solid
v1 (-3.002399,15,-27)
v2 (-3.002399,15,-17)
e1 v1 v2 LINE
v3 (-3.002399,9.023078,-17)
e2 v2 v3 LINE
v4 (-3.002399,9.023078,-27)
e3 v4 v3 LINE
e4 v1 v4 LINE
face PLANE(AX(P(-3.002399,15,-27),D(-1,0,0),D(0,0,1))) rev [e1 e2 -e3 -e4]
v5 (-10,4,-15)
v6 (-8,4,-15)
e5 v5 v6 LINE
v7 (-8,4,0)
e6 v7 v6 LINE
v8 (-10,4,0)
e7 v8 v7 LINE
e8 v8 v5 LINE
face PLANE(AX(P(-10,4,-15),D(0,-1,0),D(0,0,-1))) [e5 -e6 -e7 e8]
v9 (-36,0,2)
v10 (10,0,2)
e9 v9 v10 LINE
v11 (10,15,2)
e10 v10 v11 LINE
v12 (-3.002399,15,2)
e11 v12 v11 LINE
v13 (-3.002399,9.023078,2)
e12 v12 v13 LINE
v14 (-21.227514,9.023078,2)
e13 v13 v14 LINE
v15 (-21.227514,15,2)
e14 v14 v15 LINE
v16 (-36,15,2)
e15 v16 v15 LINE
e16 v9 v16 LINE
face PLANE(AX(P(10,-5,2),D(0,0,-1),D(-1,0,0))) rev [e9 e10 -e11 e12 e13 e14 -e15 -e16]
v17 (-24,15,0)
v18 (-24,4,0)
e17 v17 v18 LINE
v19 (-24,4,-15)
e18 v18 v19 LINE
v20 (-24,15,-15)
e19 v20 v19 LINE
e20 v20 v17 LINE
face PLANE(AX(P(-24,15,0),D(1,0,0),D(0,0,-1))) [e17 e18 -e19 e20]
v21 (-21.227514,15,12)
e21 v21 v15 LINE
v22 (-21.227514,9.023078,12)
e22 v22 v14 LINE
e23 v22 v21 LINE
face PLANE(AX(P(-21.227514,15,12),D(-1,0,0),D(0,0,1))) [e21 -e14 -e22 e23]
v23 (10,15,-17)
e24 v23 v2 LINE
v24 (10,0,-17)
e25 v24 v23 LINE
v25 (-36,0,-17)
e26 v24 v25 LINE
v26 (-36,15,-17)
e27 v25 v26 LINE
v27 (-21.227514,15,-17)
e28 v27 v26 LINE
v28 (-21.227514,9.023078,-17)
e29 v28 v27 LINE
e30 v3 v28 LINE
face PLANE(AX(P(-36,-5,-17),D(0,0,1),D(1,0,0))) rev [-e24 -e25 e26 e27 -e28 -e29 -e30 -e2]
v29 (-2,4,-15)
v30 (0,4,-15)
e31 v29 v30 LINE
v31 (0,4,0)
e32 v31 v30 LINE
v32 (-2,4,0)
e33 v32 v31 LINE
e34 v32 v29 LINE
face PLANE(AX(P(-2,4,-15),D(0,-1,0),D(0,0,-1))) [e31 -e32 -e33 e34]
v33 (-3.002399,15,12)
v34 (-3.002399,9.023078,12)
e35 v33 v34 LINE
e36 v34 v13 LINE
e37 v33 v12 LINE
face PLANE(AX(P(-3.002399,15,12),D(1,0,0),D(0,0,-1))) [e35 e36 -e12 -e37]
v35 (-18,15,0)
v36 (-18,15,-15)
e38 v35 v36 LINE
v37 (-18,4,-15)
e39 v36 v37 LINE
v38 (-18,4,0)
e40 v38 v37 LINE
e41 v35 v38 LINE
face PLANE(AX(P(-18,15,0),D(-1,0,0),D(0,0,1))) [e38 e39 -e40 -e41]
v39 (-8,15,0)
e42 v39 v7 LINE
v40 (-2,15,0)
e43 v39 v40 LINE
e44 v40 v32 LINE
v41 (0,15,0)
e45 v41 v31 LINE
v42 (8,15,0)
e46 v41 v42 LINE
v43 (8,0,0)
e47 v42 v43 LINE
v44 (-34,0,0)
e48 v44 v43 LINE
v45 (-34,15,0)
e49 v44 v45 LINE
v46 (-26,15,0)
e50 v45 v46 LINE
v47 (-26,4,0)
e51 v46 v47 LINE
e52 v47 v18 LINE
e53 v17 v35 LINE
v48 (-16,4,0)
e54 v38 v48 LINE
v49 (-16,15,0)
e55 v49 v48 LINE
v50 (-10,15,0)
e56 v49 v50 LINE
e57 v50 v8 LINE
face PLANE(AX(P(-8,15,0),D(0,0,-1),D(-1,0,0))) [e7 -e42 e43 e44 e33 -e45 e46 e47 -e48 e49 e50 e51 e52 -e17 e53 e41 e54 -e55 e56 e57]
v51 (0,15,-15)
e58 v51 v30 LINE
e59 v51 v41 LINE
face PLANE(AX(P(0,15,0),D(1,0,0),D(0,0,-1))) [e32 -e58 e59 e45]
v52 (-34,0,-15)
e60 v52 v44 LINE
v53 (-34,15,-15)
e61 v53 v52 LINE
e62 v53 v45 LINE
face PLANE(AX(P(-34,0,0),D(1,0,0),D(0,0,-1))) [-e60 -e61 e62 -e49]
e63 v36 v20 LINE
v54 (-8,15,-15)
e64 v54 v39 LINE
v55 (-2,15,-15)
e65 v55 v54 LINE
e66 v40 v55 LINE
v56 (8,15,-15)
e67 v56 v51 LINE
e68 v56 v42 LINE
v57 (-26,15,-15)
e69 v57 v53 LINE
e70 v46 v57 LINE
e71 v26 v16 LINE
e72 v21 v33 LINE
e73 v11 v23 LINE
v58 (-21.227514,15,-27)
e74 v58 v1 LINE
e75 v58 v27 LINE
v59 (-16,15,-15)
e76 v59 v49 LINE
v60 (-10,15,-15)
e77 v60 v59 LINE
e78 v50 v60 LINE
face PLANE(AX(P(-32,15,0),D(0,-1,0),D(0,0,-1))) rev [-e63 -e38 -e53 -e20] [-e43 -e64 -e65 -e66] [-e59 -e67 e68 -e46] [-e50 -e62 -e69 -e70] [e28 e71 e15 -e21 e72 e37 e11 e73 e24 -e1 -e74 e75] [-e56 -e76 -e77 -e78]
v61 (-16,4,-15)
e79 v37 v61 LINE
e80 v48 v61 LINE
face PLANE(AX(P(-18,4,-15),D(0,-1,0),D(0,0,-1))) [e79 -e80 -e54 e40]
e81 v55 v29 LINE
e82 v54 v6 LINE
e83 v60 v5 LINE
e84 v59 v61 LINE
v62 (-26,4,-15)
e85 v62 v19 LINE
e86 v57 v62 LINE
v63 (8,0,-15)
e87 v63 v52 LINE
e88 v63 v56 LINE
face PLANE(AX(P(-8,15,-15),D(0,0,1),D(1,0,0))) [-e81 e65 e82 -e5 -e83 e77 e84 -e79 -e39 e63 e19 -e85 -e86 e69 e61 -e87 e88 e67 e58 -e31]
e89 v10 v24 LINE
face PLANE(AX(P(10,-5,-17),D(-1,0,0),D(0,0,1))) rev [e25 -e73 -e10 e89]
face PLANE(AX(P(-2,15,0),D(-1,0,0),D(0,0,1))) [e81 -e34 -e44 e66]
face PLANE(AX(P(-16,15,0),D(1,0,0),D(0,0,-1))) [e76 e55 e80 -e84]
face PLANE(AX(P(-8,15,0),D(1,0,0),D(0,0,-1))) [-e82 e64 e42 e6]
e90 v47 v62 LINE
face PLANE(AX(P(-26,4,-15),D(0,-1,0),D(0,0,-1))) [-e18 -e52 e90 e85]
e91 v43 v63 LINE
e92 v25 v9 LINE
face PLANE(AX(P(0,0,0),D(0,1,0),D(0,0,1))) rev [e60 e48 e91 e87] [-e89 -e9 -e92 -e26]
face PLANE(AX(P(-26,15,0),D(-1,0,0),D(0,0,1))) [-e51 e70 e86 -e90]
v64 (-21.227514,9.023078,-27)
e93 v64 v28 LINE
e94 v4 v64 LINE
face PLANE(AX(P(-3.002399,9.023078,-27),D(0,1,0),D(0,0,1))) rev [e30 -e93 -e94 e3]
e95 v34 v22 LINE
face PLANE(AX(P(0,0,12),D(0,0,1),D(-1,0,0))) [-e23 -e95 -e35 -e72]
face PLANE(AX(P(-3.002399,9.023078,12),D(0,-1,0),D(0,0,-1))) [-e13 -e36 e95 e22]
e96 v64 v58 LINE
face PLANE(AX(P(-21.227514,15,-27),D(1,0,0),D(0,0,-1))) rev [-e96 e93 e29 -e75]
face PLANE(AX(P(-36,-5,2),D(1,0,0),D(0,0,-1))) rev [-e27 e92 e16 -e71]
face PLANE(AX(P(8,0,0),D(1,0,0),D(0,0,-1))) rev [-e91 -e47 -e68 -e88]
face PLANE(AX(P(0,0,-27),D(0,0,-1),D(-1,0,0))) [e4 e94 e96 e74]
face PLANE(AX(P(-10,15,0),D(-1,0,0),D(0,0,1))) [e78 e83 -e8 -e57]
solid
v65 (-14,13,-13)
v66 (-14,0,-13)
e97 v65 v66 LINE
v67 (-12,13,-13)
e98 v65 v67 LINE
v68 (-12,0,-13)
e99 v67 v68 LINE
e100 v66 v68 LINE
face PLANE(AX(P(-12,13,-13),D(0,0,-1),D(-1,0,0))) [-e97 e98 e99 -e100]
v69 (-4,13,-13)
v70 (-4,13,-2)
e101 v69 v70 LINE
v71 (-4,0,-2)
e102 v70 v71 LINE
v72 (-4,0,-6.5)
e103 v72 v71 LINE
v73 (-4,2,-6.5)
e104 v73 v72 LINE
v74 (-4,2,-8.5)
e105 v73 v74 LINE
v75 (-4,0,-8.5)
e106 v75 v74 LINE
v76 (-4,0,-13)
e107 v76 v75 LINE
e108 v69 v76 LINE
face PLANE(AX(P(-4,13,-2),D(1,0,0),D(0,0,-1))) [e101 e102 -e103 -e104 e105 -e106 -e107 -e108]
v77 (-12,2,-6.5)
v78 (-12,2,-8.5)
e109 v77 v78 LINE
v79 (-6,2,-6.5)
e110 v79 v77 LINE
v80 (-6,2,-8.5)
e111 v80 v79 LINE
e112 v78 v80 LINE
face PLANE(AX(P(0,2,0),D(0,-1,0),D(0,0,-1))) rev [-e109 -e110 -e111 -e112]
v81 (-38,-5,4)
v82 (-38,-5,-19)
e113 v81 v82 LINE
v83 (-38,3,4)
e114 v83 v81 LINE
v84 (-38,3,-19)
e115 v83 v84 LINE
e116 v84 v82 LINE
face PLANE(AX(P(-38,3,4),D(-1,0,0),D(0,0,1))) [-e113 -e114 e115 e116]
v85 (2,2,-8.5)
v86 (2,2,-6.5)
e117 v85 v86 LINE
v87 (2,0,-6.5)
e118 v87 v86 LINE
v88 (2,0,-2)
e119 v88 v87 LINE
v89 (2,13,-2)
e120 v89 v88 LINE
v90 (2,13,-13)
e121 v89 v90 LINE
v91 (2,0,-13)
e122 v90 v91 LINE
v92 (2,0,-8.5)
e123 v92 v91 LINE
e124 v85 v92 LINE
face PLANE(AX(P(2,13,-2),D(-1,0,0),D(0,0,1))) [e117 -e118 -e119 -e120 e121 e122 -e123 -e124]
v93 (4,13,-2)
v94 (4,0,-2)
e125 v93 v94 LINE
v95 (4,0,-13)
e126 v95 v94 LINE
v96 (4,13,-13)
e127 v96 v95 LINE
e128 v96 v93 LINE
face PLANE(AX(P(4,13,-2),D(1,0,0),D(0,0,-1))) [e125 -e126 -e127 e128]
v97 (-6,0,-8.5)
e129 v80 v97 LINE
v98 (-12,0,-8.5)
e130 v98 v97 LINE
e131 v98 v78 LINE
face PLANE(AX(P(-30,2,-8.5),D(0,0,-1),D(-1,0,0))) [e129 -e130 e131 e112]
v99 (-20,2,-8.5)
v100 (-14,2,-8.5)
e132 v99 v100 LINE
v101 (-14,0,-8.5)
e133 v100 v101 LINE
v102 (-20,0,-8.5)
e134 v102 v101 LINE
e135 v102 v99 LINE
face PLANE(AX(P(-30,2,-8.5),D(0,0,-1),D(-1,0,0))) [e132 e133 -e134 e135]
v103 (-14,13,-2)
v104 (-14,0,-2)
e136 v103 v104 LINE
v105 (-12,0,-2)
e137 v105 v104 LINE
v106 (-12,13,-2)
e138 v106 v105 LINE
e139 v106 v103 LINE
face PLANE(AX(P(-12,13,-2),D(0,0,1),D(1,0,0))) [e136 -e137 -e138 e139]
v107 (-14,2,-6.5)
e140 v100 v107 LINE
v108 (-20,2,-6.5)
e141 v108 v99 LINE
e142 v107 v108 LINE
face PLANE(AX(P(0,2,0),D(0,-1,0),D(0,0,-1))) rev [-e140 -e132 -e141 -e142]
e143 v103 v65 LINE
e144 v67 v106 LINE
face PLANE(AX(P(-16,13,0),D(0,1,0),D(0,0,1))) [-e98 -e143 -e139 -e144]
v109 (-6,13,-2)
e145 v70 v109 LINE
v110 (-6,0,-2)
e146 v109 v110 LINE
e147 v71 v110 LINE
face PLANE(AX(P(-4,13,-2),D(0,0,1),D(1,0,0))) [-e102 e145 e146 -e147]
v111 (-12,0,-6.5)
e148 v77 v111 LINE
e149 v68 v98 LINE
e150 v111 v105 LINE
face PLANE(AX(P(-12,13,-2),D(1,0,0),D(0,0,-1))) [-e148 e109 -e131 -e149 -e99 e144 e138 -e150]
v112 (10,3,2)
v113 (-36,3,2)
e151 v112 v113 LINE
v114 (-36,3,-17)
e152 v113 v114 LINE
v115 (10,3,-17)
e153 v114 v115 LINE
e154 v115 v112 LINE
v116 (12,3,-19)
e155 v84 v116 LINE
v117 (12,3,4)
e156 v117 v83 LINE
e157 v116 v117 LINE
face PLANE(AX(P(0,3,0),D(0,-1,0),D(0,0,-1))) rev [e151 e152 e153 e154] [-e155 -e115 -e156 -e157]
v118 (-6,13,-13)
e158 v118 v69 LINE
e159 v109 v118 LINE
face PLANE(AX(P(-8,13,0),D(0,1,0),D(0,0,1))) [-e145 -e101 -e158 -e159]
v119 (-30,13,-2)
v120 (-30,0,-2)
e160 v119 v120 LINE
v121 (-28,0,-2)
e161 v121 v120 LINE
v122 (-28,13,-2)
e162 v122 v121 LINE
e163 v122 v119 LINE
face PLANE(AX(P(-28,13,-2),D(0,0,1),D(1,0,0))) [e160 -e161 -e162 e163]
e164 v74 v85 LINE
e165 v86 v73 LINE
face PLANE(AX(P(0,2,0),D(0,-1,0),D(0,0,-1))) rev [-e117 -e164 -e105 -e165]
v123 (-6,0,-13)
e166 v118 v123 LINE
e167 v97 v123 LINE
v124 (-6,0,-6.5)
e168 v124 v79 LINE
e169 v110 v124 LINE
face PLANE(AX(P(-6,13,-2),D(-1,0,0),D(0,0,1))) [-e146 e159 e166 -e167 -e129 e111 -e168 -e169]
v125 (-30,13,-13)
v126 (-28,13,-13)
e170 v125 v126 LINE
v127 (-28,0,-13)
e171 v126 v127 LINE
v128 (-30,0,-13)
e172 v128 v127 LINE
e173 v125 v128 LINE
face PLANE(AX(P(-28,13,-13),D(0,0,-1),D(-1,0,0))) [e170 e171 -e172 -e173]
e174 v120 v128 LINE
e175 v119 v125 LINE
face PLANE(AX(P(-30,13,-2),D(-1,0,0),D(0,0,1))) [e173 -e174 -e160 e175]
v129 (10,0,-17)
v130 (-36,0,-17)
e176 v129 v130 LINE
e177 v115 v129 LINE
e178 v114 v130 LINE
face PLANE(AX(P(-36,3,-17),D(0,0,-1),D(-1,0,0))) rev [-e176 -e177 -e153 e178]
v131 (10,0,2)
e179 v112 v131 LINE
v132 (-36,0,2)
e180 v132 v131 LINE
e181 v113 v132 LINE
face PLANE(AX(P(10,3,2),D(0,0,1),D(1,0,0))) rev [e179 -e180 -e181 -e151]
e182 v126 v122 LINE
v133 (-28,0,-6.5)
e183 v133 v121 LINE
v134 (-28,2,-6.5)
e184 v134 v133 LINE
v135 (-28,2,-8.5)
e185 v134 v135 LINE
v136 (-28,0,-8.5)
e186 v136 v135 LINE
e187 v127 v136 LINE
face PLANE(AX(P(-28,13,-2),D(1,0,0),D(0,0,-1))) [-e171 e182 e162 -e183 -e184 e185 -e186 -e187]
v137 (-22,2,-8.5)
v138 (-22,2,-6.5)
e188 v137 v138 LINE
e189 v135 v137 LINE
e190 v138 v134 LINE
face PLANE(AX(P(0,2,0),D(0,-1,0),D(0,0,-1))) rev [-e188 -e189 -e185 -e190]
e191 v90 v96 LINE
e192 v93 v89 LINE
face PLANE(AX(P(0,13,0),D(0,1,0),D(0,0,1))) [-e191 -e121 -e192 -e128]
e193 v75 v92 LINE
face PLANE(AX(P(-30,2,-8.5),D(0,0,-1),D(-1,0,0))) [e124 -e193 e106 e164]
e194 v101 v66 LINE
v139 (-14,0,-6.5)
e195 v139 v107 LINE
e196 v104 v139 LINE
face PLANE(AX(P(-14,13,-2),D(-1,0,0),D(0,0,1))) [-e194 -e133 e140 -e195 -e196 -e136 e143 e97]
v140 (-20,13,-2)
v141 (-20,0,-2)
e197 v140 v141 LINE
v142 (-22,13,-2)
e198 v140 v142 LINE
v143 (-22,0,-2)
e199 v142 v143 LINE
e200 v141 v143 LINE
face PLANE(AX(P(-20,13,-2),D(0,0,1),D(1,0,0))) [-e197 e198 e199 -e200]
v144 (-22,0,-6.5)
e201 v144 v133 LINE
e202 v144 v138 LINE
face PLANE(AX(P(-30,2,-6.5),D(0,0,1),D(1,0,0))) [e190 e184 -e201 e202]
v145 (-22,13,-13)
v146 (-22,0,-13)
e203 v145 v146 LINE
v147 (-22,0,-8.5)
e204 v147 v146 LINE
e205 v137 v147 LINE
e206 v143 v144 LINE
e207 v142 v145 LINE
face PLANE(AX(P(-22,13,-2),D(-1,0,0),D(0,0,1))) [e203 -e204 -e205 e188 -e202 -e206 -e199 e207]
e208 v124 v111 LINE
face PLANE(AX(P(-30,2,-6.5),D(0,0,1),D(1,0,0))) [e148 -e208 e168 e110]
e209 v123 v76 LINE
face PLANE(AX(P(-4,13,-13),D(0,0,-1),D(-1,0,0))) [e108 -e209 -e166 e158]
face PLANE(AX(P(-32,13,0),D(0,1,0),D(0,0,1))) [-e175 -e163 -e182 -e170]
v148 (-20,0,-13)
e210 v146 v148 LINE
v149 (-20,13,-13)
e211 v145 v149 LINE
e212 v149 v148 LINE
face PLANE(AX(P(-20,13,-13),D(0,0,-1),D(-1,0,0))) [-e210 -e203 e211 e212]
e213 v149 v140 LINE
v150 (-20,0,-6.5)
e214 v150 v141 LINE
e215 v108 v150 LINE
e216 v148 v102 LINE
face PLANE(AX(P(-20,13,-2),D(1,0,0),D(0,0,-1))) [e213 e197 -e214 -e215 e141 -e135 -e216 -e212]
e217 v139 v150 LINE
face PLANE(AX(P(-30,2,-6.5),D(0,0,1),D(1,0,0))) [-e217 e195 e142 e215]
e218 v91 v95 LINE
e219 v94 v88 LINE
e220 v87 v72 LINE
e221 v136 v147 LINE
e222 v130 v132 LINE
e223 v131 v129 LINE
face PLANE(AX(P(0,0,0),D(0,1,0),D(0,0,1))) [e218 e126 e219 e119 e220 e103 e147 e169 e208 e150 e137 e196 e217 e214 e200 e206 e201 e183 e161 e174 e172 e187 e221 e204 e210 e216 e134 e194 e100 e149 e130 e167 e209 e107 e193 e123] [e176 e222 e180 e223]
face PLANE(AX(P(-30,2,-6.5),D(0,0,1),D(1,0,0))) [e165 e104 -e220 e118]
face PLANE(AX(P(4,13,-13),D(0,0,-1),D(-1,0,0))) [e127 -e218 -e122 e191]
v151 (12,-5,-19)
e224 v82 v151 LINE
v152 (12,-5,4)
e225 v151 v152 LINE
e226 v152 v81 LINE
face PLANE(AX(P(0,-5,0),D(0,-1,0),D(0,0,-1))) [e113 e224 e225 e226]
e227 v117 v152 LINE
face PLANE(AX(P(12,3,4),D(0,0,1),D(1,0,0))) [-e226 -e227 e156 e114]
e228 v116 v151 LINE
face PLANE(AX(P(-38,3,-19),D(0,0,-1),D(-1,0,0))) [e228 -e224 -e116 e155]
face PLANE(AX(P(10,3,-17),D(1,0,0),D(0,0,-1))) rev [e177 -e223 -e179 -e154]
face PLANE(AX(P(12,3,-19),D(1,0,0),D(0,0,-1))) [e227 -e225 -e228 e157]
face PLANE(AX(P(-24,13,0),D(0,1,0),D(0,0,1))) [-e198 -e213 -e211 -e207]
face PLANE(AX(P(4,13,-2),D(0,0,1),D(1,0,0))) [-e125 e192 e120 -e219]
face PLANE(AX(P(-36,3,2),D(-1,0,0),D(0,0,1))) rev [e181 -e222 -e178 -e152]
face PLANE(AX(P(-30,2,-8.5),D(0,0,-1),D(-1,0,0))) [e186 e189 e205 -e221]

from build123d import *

# Parameters (mm, degrees)
SKETCH1_W           = 6
SKETCH1_H           = 15
BOSS_EXTRUDE1_DEPTH = 15
SKETCH2_W           = 2
SKETCH2_H           = 11
CUT_EXTRUDE1_DEPTH  = 13
SKETCH3_W           = 15
SKETCH3_H           = 4
BOSS_EXTRUDE2_DEPTH = 2
LPATTERN1_COUNT     = 5
LPATTERN1_PITCH     = 8
SKETCH6_W           = 15
SKETCH6_H           = 15
BOSS_EXTRUDE4_DEPTH = 2
SKETCH8_W           = 15
SKETCH8_H           = 11
BOSS_EXTRUDE5_DEPTH = 2
SKETCH9_W           = 34
SKETCH9_H           = 2
CUT_EXTRUDE2_DEPTH  = 2
BOSS_EXTRUDE6_START = -15
SKETCH10_W          = 46
SKETCH10_H          = 19
BOSS_EXTRUDE6_DEPTH = 20
SPLIT1_START        = -17
SPLIT1_OUTLINE_W    = 46
SPLIT1_OUTLINE_H    = 5
SPLIT1_DEPTH        = 19
SPLIT1_START_2      = -13
SPLIT1_2_OUTLINE_W  = 2
SPLIT1_2_OUTLINE_H  = 13
SPLIT1_2_DEPTH      = 11
SPLIT1_START_3      = -8.5
SPLIT1_3_OUTLINE_W  = 6
SPLIT1_3_OUTLINE_H  = 2
SPLIT1_3_DEPTH      = 2
SPLIT1_START_4      = -5
SPLIT1_4_OUTLINE_W  = 46
SPLIT1_4_OUTLINE_H  = 19
SPLIT1_4_DEPTH      = 5
SPLIT1_5_OUTLINE_W  = 2
SPLIT1_5_OUTLINE_H  = 11
SPLIT1_5_DEPTH      = 13
SPLIT1_6_OUTLINE_W  = 6
SPLIT1_6_OUTLINE_H  = 2
SPLIT1_6_DEPTH      = 2
SKETCH11_W          = 18.225114874
SKETCH11_H          = 5.976921675
BOSS_EXTRUDE7_DEPTH = 10
SKETCH12_W          = 50
SKETCH12_H          = 23
SKETCH12_W_2        = 46
SKETCH12_H_2        = 19
BOSS_EXTRUDE8_DEPTH = 8


# Read off the part's stored shape, not the designer's step: Split1
with BuildPart() as part:
    # Sketch1 → Boss-Extrude1 (new body)
    with BuildSketch(Plane(origin=(0, 0, 0), x_dir=(1, 0, 0), z_dir=(0, 1, 0))):
        with Locations((3, 7.5)):
            Rectangle(SKETCH1_W, SKETCH1_H)
    extrude(amount=BOSS_EXTRUDE1_DEPTH)

    # Sketch2 → Cut-Extrude1 (cut)
    with BuildSketch(Plane.XZ):
        with Locations((3, -7.5)):
            Rectangle(SKETCH2_W, SKETCH2_H)
    extrude(amount=-CUT_EXTRUDE1_DEPTH, mode=Mode.SUBTRACT)

    # Sketch3 → Boss-Extrude2 (add)
    with BuildSketch(Plane.ZY):
        with Locations((-7.5, 2)):
            Rectangle(SKETCH3_W, SKETCH3_H)
    extrude(amount=BOSS_EXTRUDE2_DEPTH)


with BuildPart() as lpattern1_1:
    # LPattern1: pattern copy
    add(part.part.moved(Location(Vector(-1, 0, 0) * (1 * LPATTERN1_PITCH))))


with BuildPart() as lpattern1_2:
    # LPattern1: pattern copy
    add(part.part.moved(Location(Vector(-1, 0, 0) * (2 * LPATTERN1_PITCH))))


with BuildPart() as lpattern1_3:
    # LPattern1: pattern copy
    add(part.part.moved(Location(Vector(-1, 0, 0) * (3 * LPATTERN1_PITCH))))


with BuildPart() as lpattern1_4:
    # LPattern1: pattern copy
    add(part.part.moved(Location(Vector(-1, 0, 0) * (4 * LPATTERN1_PITCH))))


with BuildPart() as lpattern1_1_1:
    add(lpattern1_1.part)

    # Combine1: union LPattern1_2, LPattern1_3, part, LPattern1_4
    add(lpattern1_2.part)
    add(lpattern1_3.part)
    add(part.part)
    add(lpattern1_4.part)

    # Sketch6 → Boss-Extrude4 (add)
    with BuildSketch(Plane(origin=(6, 0, 0), x_dir=(0, 0, -1), z_dir=(1, 0, 0))):
        with Locations((7.5, 7.5)):
            Rectangle(SKETCH6_W, SKETCH6_H)
    extrude(amount=BOSS_EXTRUDE4_DEPTH)

    # Sketch8 → Boss-Extrude5 (add)
    with BuildSketch(Plane.ZY.offset(32)):
        with Locations((-7.5, 9.5)):
            Rectangle(SKETCH8_W, SKETCH8_H)
    extrude(amount=BOSS_EXTRUDE5_DEPTH)

    # Sketch9 → Cut-Extrude2 (cut)
    with BuildSketch(Plane.XZ):
        with Locations((-13, -7.5)):
            Rectangle(SKETCH9_W, SKETCH9_H)
    extrude(amount=-CUT_EXTRUDE2_DEPTH, mode=Mode.SUBTRACT)


with BuildPart() as body_2:
    # Sketch10 → Boss-Extrude6 (new body)
    with BuildSketch(Plane.XZ.offset(BOSS_EXTRUDE6_START)):
        with Locations((-13, -7.5)):
            Rectangle(SKETCH10_W, SKETCH10_H)
    extrude(amount=BOSS_EXTRUDE6_DEPTH)

    # Combine2: cut LPattern1_1
    add(lpattern1_1_1.part, mode=Mode.SUBTRACT)

    # Split1 4 outline → Split1 4 (cut)
    with BuildSketch(Plane(origin=(0, 0, 0), x_dir=(1, 0, 0), z_dir=(0, 1, 0)).offset(SPLIT1_START_4)):
        with Locations((-13, 7.5)):
            Rectangle(SPLIT1_4_OUTLINE_W, SPLIT1_4_OUTLINE_H)
    extrude(amount=SPLIT1_4_DEPTH, mode=Mode.SUBTRACT)

    # Split1 5 outline → Split1 5 (cut)
    with BuildSketch(Plane(origin=(0, 0, 0), x_dir=(1, 0, 0), z_dir=(0, 1, 0))):
        with Locations((-5, 7.5)):
            Rectangle(SPLIT1_5_OUTLINE_W, SPLIT1_5_OUTLINE_H)
        with Locations((3, 7.5)):
            Rectangle(SPLIT1_5_OUTLINE_W, SPLIT1_5_OUTLINE_H)
        with Locations((-13, 7.5)):
            Rectangle(SPLIT1_5_OUTLINE_W, SPLIT1_5_OUTLINE_H)
        with Locations((-21, 7.5)):
            Rectangle(SPLIT1_5_OUTLINE_W, SPLIT1_5_OUTLINE_H)
        with Locations((-29, 7.5)):
            Rectangle(SPLIT1_5_OUTLINE_W, SPLIT1_5_OUTLINE_H)
    extrude(amount=SPLIT1_5_DEPTH, mode=Mode.SUBTRACT)

    # Split1 6 outline → Split1 6 (cut)
    with BuildSketch(Plane(origin=(0, 0, 0), x_dir=(1, 0, 0), z_dir=(0, 1, 0))):
        with Locations((-1, 7.5)):
            Rectangle(SPLIT1_6_OUTLINE_W, SPLIT1_6_OUTLINE_H)
        with Locations((-9, 7.5)):
            Rectangle(SPLIT1_6_OUTLINE_W, SPLIT1_6_OUTLINE_H)
        with Locations((-17, 7.5)):
            Rectangle(SPLIT1_6_OUTLINE_W, SPLIT1_6_OUTLINE_H)
        with Locations((-25, 7.5)):
            Rectangle(SPLIT1_6_OUTLINE_W, SPLIT1_6_OUTLINE_H)
    extrude(amount=SPLIT1_6_DEPTH, mode=Mode.SUBTRACT)

    # Sketch11 → Boss-Extrude7 (add)
    with BuildSketch(Plane(origin=(0, 0, -17), x_dir=(-1, 0, 0), z_dir=(0, 0, -1))):
        with Locations((12.114956568, 12.011539163)):
            Rectangle(SKETCH11_W, SKETCH11_H)
    boss_extrude7 = extrude(amount=BOSS_EXTRUDE7_DEPTH)

    # Mirror1: Boss-Extrude7 across plane
    add(boss_extrude7.mirror(Plane.XY.offset(-7.5)))


with BuildPart() as body_2_2:
    # Split1 outline → Split1 (new body)
    with BuildSketch(Plane.XY.offset(SPLIT1_START)):
        with Locations((-13, -2.5)):
            Rectangle(SPLIT1_OUTLINE_W, SPLIT1_OUTLINE_H)
    extrude(amount=SPLIT1_DEPTH)

    # Split1 2 outline → Split1 2 (add)
    with BuildSketch(Plane.XY.offset(SPLIT1_START_2)):
        with Locations((-29, 6.5)):
            Rectangle(SPLIT1_2_OUTLINE_W, SPLIT1_2_OUTLINE_H)
        with Locations((-21, 6.5)):
            Rectangle(SPLIT1_2_OUTLINE_W, SPLIT1_2_OUTLINE_H)
        with Locations((-13, 6.5)):
            Rectangle(SPLIT1_2_OUTLINE_W, SPLIT1_2_OUTLINE_H)
        with Locations((3, 6.5)):
            Rectangle(SPLIT1_2_OUTLINE_W, SPLIT1_2_OUTLINE_H)
        with Locations((-5, 6.5)):
            Rectangle(SPLIT1_2_OUTLINE_W, SPLIT1_2_OUTLINE_H)
    extrude(amount=SPLIT1_2_DEPTH)

    # Split1 3 outline → Split1 3 (add)
    with BuildSketch(Plane.XY.offset(SPLIT1_START_3)):
        with Locations((-25, 1)):
            Rectangle(SPLIT1_3_OUTLINE_W, SPLIT1_3_OUTLINE_H)
        with Locations((-17, 1)):
            Rectangle(SPLIT1_3_OUTLINE_W, SPLIT1_3_OUTLINE_H)
        with Locations((-9, 1)):
            Rectangle(SPLIT1_3_OUTLINE_W, SPLIT1_3_OUTLINE_H)
        with Locations((-1, 1)):
            Rectangle(SPLIT1_3_OUTLINE_W, SPLIT1_3_OUTLINE_H)
    extrude(amount=SPLIT1_3_DEPTH)

    # Sketch12 → Boss-Extrude8 (add)
    with BuildSketch(Plane.XZ.offset(5)):
        with Locations((-13, -7.5)):
            Rectangle(SKETCH12_W, SKETCH12_H)
        with Locations((-13, -7.5)):
            Rectangle(SKETCH12_W_2, SKETCH12_H_2, mode=Mode.SUBTRACT)
    extrude(amount=-BOSS_EXTRUDE8_DEPTH)


solid = Compound([body_2.part, body_2_2.part])
